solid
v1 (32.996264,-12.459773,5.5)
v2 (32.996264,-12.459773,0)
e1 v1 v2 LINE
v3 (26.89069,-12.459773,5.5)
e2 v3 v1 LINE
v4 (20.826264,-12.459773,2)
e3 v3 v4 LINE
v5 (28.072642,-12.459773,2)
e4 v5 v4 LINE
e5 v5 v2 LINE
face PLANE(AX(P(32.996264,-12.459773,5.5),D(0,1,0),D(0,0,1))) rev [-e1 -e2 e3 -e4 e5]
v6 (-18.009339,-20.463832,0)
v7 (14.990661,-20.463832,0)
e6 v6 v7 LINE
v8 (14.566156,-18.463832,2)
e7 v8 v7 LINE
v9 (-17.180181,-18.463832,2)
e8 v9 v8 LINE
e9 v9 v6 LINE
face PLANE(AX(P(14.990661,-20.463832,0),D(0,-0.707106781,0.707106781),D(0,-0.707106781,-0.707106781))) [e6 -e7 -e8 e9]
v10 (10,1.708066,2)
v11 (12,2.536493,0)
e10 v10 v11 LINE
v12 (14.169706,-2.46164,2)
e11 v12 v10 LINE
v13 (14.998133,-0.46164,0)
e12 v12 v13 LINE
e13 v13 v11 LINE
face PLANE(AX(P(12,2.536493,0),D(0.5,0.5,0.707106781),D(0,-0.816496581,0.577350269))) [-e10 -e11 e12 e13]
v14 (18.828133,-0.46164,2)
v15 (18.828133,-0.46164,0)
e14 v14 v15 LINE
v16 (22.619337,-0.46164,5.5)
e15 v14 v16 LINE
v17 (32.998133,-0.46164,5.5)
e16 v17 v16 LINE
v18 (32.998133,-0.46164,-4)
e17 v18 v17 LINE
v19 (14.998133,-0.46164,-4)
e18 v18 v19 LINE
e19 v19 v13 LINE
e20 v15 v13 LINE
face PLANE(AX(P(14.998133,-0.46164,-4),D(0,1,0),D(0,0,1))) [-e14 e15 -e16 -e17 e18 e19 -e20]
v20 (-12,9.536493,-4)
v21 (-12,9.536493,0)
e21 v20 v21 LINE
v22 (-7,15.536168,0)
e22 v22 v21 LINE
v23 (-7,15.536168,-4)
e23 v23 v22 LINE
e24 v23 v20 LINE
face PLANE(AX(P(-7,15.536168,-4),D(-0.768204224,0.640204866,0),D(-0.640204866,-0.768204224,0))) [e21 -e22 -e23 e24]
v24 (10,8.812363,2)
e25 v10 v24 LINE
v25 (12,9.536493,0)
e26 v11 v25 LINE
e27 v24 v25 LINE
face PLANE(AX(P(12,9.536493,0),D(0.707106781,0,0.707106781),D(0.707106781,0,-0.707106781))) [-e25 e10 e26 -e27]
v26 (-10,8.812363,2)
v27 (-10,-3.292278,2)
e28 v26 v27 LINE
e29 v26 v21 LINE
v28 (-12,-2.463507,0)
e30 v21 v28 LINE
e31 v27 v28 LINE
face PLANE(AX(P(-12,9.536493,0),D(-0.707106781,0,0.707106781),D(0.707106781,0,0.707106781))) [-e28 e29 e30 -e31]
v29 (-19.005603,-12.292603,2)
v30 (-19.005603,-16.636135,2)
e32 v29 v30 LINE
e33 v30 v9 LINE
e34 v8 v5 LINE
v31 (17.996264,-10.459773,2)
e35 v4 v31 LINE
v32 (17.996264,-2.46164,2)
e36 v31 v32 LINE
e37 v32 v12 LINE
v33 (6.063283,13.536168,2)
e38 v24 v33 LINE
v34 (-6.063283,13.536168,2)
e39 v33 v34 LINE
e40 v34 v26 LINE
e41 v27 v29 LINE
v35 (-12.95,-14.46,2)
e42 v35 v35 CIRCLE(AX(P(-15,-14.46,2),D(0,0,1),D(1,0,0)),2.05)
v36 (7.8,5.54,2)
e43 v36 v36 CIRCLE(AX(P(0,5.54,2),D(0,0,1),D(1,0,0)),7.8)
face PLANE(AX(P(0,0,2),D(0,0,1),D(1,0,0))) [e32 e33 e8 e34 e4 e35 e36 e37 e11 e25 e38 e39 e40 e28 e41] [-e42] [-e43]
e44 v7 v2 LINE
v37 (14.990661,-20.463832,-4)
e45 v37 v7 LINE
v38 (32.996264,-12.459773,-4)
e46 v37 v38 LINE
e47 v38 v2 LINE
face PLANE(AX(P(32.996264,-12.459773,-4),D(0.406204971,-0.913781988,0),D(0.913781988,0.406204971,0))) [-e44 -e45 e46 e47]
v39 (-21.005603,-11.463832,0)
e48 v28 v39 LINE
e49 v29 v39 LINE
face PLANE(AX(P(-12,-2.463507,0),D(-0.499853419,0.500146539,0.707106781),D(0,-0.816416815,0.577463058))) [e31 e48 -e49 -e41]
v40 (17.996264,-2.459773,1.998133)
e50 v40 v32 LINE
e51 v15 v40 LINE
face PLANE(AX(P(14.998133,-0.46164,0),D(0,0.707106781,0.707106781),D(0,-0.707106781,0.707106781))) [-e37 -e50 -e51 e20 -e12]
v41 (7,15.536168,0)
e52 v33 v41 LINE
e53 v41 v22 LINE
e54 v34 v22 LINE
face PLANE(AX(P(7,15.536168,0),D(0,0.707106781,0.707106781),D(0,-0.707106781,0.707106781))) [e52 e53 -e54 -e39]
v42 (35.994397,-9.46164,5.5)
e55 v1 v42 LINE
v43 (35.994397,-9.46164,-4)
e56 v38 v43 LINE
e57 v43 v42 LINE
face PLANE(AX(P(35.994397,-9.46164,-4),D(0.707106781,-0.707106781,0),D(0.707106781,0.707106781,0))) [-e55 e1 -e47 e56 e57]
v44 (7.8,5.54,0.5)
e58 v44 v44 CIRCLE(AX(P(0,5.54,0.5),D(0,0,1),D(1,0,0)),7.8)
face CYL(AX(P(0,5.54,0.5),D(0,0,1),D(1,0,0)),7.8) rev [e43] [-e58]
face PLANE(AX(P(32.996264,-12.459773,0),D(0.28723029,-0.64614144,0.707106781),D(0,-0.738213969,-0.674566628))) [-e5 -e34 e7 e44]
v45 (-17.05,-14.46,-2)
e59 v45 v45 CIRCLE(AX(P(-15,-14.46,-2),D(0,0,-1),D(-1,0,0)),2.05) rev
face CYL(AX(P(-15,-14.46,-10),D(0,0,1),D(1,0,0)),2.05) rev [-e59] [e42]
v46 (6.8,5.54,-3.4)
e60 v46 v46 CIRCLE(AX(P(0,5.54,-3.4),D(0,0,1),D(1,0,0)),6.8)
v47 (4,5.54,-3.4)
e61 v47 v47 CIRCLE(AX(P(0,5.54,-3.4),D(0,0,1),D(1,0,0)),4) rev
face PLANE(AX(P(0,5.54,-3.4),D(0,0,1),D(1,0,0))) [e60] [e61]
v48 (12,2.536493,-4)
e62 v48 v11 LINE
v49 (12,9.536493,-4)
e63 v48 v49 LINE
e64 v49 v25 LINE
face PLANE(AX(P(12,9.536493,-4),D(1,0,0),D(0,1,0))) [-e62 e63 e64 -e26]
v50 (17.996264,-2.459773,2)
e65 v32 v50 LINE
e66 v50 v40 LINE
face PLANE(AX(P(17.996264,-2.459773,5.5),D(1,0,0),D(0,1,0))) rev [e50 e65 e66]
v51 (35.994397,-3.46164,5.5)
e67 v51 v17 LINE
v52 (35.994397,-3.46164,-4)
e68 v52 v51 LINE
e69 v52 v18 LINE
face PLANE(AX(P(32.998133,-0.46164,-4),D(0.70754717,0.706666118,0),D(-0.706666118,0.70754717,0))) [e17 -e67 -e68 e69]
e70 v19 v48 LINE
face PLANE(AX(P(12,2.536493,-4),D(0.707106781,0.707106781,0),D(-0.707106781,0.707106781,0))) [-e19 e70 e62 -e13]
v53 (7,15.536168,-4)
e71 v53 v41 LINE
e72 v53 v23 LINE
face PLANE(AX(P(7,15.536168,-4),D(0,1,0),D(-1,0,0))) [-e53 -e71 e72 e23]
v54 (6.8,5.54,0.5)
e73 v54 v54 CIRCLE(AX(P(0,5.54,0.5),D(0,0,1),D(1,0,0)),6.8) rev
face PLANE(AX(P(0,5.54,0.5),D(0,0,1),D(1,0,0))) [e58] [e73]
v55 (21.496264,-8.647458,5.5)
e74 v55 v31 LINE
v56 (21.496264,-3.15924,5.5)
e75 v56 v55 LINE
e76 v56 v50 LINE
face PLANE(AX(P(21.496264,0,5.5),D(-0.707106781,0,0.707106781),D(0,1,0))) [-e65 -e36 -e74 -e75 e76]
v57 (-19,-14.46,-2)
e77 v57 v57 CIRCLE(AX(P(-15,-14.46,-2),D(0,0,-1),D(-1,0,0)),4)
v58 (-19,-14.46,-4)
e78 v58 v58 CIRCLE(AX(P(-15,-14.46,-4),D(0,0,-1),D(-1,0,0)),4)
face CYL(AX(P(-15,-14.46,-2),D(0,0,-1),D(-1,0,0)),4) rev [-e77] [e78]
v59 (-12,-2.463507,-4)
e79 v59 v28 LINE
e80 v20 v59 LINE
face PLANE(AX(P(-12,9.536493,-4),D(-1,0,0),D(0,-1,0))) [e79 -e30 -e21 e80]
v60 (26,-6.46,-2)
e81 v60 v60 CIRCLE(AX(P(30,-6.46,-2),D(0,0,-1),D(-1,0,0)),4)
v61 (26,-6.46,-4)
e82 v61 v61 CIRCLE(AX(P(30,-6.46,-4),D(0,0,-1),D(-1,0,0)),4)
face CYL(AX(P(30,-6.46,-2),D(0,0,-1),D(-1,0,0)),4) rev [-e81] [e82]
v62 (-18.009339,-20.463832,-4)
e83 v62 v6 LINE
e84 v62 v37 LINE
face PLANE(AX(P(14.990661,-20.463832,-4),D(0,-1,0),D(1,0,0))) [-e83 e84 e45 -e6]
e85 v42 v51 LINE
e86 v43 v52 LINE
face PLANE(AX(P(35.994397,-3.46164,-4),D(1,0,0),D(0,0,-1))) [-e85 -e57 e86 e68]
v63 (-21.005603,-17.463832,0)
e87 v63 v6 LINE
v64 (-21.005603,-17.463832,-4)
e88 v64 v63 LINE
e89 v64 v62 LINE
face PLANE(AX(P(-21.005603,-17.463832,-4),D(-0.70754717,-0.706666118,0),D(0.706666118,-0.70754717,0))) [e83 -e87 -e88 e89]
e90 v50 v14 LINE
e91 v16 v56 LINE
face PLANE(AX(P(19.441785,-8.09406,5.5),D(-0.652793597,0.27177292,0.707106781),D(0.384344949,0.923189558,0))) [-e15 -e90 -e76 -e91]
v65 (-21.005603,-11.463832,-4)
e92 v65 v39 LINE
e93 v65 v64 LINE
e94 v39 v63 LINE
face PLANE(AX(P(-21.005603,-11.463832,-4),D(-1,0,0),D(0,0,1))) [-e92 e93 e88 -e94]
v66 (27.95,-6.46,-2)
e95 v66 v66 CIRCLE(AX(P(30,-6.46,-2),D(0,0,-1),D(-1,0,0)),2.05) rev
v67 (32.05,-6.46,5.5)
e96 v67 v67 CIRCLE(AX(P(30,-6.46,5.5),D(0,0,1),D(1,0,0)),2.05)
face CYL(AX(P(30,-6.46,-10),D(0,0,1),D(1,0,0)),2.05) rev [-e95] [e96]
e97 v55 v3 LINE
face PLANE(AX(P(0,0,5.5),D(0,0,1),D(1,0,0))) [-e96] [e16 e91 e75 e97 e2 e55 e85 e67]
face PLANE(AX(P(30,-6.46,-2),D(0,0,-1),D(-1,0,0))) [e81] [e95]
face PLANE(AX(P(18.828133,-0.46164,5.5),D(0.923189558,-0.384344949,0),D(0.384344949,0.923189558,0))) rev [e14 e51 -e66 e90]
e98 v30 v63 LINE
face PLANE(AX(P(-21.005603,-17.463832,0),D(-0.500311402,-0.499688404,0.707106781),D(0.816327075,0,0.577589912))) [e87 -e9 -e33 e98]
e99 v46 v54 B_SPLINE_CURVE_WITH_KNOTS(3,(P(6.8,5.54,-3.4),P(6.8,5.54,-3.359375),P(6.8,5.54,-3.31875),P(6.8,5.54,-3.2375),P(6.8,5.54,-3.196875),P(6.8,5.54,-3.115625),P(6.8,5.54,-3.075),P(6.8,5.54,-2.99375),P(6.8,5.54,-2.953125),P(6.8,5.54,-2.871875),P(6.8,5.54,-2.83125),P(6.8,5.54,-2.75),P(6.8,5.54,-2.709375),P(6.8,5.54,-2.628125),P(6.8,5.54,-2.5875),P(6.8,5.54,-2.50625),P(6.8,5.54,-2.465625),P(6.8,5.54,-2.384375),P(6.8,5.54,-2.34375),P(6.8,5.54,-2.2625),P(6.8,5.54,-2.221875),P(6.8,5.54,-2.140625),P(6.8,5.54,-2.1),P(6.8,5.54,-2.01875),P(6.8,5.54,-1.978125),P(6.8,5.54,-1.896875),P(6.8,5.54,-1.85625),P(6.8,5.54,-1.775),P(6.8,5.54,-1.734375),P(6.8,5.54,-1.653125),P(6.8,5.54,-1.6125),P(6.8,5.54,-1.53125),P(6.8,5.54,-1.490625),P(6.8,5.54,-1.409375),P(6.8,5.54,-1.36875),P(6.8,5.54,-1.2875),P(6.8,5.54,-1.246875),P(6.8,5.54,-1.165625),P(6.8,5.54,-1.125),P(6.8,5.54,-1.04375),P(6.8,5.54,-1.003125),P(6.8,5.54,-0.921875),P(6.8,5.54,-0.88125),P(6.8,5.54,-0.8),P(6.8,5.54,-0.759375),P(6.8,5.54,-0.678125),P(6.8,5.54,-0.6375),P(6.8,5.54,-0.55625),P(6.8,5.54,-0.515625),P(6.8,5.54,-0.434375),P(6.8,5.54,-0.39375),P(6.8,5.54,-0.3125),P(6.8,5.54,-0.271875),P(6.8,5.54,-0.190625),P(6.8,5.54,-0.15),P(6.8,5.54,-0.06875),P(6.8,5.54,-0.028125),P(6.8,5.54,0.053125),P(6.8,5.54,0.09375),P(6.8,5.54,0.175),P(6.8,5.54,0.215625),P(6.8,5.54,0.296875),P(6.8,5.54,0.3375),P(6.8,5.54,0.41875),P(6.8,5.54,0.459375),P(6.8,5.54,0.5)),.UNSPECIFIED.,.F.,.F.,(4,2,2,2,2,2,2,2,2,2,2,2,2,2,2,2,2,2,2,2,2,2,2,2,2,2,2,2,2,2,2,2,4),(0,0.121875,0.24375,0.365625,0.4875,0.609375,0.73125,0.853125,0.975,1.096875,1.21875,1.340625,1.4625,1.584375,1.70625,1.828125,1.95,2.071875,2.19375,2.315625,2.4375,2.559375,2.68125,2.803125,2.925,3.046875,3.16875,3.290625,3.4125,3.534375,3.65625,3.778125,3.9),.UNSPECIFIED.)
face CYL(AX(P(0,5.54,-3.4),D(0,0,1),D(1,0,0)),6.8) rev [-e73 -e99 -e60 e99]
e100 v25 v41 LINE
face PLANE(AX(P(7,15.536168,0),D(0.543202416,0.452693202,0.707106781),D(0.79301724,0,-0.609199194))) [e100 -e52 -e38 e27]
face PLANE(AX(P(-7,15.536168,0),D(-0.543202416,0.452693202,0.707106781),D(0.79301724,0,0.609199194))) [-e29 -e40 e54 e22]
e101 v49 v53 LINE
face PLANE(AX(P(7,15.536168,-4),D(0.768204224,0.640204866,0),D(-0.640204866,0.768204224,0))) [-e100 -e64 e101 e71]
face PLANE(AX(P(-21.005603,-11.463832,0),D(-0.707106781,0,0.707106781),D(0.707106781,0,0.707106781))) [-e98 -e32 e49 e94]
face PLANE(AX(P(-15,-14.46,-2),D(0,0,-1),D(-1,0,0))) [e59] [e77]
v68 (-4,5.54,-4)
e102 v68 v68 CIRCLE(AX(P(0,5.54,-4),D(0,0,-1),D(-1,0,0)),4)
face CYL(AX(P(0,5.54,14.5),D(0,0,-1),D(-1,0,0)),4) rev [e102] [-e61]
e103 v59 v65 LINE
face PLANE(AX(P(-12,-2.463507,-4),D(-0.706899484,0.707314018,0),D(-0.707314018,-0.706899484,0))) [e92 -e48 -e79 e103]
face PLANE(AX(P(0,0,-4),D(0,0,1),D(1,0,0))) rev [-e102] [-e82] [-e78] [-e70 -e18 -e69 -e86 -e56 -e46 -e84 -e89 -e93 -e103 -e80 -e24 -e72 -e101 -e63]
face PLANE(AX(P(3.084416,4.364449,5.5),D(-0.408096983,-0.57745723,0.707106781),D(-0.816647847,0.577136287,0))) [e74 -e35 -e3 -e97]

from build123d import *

# Parameters (mm, degrees)
BOSS_EXTRUDE1_DEPTH = 4
BOSS_EXTRUDE2_DEPTH = 2
BOSS_EXTRUDE2_DRAFT = 45
BOSS_EXTRUDE3_DEPTH = 5.5
SKETCH6_R           = 4
CUT_EXTRUDE1_DEPTH  = 18.5
SKETCH7_R           = 6.8
CUT_EXTRUDE2_DEPTH  = 5.4
SKETCH8_R           = 7.8
CUT_EXTRUDE3_DEPTH  = 1.5
SKETCH9_R           = 2.05
CUT_EXTRUDE4_DEPTH  = 15.5
SKETCH10_R          = 4
CUT_EXTRUDE5_DEPTH  = 2
SKETCH11_R          = 4
CUT_EXTRUDE6_DEPTH  = 2
CHAMFER4_SIZE       = 3.5


with BuildPart() as part:
    # Sketch1 → Boss-Extrude1 (new body)
    with BuildSketch(Plane.XY):
        Polygon((7, 15.536167626), (-7, 15.536167626), (-12, 9.536492635), (-12, -2.463507365), (-21.005602907, -11.463832374), (-21.005602907, -17.463832374), (-18.009338566, -20.463832374), (14.990661434, -20.463832374), (32.996264341, -12.45977287), (35.994397093, -9.461640117), (35.994397093, -3.461640117), (32.998132752, -0.461640117), (14.998132752, -0.461640117), (12, 2.536492635), (12, 9.536492635), align=None)
    extrude(amount=-BOSS_EXTRUDE1_DEPTH)


with BuildPart() as boss_extrude2_tool:
    # Sketch2 → Boss-Extrude2 (with draft: the straight prism first)
    with BuildSketch(Plane.XY):
        Polygon((7, 15.536167626), (-7, 15.536167626), (-12, 9.536492635), (-12, -2.463507365), (-21.005602907, -11.463832374), (-21.005602907, -17.463832374), (-18.009338566, -20.463832374), (14.990661434, -20.463832374), (32.996264341, -12.45977287), (35.994397093, -9.461640117), (35.994397093, -3.461640117), (32.998132752, -0.461640117), (14.998132752, -0.461640117), (12, 2.536492635), (12, 9.536492635), align=None)
    extrude(amount=BOSS_EXTRUDE2_DEPTH)
    # Boss-Extrude2: the draft: its side faces are tilted about the plane it starts from
    boss_extrude2_sides = [boss_extrude2_tool.faces().sort_by_distance(p)[0] for p in [
        (0, 15.536167626, 1),
        (-9.5, 12.536330131, 1),
        (-12, 3.536492635, 1),
        (-16.502801453, -6.963669869, 1),
        (-21.005602907, -14.463832374, 1),
        (-19.507470737, -18.963832374, 1),
        (-1.509338566, -20.463832374, 1),
        (23.993462887, -16.461802622, 1),
        (34.495330717, -10.960706493, 1),
        (35.994397093, -6.461640117, 1),
        (34.496264923, -1.961640117, 1),
        (23.998132752, -0.461640117, 1),
        (13.499066376, 1.037426259, 1),
        (12, 6.036492635, 1),
        (9.5, 12.536330131, 1),
    ]]
    draft(boss_extrude2_sides, Plane.XY, BOSS_EXTRUDE2_DRAFT)


with BuildPart() as part_1:
    add(part.part)

    # Boss-Extrude2: add boss_extrude2_tool
    add(boss_extrude2_tool.part)

    # Sketch4 → Boss-Extrude3 (add)
    with BuildSketch(Plane.XY):
        Polygon((32.996264341, -12.45977287), (20.826264341, -12.45977287), (17.996264341, -10.45977287), (17.996264341, -2.45977287), (18.828132752, -0.461640117), (32.998132752, -0.461640117), (35.994397093, -3.461640117), (35.994397093, -9.461640117), align=None)
    extrude(amount=BOSS_EXTRUDE3_DEPTH)

    # Sketch6 → Cut-Extrude1 (cut)
    with BuildSketch(Plane(origin=(0, 0, -4), x_dir=(-1, 0, 0), z_dir=(0, 0, -1))):
        with Locations((0, 5.54)):
            Circle(SKETCH6_R)
    extrude(amount=-CUT_EXTRUDE1_DEPTH, mode=Mode.SUBTRACT)

    # Sketch7 → Cut-Extrude2 (cut)
    with BuildSketch(Plane.XY.offset(2)):
        with Locations((0, 5.54)):
            Circle(SKETCH7_R)
    extrude(amount=-CUT_EXTRUDE2_DEPTH, mode=Mode.SUBTRACT)

    # Sketch8 → Cut-Extrude3 (cut)
    with BuildSketch(Plane.XY.offset(2)):
        with Locations((0, 5.54)):
            Circle(SKETCH8_R)
    extrude(amount=-CUT_EXTRUDE3_DEPTH, mode=Mode.SUBTRACT)

    # Sketch9 → Cut-Extrude4 (cut)
    with BuildSketch(Plane.XY.offset(5.5)):
        with Locations((-15, -14.46)):
            Circle(SKETCH9_R)
        with Locations((30, -6.46)):
            Circle(SKETCH9_R)
    extrude(amount=-CUT_EXTRUDE4_DEPTH, mode=Mode.SUBTRACT)

    # Sketch10 → Cut-Extrude5 (cut)
    with BuildSketch(Plane(origin=(0, 0, -4), x_dir=(-1, 0, 0), z_dir=(0, 0, -1))):
        with Locations((15, -14.46)):
            Circle(SKETCH10_R)
    extrude(amount=-CUT_EXTRUDE5_DEPTH, mode=Mode.SUBTRACT)

    # Sketch11 → Cut-Extrude6 (cut)
    with BuildSketch(Plane(origin=(0, 0, -4), x_dir=(-1, 0, 0), z_dir=(0, 0, -1))):
        with Locations((-30, -6.46)):
            Circle(SKETCH11_R)
    extrude(amount=-CUT_EXTRUDE6_DEPTH, mode=Mode.SUBTRACT)

    # Chamfer4
    chamfer4_edges = [part_1.edges().sort_by_distance(p)[0] for p in [
        (19.411264341, -11.45977287, 5.5),
        (18.412198547, -1.460706493, 5.5),
        (17.996264341, -6.45977287, 5.5),
    ]]
    chamfer(chamfer4_edges, length=CHAMFER4_SIZE - 0.0001)  # a hair under: the kernel refuses the full size


solid = part_1.part
